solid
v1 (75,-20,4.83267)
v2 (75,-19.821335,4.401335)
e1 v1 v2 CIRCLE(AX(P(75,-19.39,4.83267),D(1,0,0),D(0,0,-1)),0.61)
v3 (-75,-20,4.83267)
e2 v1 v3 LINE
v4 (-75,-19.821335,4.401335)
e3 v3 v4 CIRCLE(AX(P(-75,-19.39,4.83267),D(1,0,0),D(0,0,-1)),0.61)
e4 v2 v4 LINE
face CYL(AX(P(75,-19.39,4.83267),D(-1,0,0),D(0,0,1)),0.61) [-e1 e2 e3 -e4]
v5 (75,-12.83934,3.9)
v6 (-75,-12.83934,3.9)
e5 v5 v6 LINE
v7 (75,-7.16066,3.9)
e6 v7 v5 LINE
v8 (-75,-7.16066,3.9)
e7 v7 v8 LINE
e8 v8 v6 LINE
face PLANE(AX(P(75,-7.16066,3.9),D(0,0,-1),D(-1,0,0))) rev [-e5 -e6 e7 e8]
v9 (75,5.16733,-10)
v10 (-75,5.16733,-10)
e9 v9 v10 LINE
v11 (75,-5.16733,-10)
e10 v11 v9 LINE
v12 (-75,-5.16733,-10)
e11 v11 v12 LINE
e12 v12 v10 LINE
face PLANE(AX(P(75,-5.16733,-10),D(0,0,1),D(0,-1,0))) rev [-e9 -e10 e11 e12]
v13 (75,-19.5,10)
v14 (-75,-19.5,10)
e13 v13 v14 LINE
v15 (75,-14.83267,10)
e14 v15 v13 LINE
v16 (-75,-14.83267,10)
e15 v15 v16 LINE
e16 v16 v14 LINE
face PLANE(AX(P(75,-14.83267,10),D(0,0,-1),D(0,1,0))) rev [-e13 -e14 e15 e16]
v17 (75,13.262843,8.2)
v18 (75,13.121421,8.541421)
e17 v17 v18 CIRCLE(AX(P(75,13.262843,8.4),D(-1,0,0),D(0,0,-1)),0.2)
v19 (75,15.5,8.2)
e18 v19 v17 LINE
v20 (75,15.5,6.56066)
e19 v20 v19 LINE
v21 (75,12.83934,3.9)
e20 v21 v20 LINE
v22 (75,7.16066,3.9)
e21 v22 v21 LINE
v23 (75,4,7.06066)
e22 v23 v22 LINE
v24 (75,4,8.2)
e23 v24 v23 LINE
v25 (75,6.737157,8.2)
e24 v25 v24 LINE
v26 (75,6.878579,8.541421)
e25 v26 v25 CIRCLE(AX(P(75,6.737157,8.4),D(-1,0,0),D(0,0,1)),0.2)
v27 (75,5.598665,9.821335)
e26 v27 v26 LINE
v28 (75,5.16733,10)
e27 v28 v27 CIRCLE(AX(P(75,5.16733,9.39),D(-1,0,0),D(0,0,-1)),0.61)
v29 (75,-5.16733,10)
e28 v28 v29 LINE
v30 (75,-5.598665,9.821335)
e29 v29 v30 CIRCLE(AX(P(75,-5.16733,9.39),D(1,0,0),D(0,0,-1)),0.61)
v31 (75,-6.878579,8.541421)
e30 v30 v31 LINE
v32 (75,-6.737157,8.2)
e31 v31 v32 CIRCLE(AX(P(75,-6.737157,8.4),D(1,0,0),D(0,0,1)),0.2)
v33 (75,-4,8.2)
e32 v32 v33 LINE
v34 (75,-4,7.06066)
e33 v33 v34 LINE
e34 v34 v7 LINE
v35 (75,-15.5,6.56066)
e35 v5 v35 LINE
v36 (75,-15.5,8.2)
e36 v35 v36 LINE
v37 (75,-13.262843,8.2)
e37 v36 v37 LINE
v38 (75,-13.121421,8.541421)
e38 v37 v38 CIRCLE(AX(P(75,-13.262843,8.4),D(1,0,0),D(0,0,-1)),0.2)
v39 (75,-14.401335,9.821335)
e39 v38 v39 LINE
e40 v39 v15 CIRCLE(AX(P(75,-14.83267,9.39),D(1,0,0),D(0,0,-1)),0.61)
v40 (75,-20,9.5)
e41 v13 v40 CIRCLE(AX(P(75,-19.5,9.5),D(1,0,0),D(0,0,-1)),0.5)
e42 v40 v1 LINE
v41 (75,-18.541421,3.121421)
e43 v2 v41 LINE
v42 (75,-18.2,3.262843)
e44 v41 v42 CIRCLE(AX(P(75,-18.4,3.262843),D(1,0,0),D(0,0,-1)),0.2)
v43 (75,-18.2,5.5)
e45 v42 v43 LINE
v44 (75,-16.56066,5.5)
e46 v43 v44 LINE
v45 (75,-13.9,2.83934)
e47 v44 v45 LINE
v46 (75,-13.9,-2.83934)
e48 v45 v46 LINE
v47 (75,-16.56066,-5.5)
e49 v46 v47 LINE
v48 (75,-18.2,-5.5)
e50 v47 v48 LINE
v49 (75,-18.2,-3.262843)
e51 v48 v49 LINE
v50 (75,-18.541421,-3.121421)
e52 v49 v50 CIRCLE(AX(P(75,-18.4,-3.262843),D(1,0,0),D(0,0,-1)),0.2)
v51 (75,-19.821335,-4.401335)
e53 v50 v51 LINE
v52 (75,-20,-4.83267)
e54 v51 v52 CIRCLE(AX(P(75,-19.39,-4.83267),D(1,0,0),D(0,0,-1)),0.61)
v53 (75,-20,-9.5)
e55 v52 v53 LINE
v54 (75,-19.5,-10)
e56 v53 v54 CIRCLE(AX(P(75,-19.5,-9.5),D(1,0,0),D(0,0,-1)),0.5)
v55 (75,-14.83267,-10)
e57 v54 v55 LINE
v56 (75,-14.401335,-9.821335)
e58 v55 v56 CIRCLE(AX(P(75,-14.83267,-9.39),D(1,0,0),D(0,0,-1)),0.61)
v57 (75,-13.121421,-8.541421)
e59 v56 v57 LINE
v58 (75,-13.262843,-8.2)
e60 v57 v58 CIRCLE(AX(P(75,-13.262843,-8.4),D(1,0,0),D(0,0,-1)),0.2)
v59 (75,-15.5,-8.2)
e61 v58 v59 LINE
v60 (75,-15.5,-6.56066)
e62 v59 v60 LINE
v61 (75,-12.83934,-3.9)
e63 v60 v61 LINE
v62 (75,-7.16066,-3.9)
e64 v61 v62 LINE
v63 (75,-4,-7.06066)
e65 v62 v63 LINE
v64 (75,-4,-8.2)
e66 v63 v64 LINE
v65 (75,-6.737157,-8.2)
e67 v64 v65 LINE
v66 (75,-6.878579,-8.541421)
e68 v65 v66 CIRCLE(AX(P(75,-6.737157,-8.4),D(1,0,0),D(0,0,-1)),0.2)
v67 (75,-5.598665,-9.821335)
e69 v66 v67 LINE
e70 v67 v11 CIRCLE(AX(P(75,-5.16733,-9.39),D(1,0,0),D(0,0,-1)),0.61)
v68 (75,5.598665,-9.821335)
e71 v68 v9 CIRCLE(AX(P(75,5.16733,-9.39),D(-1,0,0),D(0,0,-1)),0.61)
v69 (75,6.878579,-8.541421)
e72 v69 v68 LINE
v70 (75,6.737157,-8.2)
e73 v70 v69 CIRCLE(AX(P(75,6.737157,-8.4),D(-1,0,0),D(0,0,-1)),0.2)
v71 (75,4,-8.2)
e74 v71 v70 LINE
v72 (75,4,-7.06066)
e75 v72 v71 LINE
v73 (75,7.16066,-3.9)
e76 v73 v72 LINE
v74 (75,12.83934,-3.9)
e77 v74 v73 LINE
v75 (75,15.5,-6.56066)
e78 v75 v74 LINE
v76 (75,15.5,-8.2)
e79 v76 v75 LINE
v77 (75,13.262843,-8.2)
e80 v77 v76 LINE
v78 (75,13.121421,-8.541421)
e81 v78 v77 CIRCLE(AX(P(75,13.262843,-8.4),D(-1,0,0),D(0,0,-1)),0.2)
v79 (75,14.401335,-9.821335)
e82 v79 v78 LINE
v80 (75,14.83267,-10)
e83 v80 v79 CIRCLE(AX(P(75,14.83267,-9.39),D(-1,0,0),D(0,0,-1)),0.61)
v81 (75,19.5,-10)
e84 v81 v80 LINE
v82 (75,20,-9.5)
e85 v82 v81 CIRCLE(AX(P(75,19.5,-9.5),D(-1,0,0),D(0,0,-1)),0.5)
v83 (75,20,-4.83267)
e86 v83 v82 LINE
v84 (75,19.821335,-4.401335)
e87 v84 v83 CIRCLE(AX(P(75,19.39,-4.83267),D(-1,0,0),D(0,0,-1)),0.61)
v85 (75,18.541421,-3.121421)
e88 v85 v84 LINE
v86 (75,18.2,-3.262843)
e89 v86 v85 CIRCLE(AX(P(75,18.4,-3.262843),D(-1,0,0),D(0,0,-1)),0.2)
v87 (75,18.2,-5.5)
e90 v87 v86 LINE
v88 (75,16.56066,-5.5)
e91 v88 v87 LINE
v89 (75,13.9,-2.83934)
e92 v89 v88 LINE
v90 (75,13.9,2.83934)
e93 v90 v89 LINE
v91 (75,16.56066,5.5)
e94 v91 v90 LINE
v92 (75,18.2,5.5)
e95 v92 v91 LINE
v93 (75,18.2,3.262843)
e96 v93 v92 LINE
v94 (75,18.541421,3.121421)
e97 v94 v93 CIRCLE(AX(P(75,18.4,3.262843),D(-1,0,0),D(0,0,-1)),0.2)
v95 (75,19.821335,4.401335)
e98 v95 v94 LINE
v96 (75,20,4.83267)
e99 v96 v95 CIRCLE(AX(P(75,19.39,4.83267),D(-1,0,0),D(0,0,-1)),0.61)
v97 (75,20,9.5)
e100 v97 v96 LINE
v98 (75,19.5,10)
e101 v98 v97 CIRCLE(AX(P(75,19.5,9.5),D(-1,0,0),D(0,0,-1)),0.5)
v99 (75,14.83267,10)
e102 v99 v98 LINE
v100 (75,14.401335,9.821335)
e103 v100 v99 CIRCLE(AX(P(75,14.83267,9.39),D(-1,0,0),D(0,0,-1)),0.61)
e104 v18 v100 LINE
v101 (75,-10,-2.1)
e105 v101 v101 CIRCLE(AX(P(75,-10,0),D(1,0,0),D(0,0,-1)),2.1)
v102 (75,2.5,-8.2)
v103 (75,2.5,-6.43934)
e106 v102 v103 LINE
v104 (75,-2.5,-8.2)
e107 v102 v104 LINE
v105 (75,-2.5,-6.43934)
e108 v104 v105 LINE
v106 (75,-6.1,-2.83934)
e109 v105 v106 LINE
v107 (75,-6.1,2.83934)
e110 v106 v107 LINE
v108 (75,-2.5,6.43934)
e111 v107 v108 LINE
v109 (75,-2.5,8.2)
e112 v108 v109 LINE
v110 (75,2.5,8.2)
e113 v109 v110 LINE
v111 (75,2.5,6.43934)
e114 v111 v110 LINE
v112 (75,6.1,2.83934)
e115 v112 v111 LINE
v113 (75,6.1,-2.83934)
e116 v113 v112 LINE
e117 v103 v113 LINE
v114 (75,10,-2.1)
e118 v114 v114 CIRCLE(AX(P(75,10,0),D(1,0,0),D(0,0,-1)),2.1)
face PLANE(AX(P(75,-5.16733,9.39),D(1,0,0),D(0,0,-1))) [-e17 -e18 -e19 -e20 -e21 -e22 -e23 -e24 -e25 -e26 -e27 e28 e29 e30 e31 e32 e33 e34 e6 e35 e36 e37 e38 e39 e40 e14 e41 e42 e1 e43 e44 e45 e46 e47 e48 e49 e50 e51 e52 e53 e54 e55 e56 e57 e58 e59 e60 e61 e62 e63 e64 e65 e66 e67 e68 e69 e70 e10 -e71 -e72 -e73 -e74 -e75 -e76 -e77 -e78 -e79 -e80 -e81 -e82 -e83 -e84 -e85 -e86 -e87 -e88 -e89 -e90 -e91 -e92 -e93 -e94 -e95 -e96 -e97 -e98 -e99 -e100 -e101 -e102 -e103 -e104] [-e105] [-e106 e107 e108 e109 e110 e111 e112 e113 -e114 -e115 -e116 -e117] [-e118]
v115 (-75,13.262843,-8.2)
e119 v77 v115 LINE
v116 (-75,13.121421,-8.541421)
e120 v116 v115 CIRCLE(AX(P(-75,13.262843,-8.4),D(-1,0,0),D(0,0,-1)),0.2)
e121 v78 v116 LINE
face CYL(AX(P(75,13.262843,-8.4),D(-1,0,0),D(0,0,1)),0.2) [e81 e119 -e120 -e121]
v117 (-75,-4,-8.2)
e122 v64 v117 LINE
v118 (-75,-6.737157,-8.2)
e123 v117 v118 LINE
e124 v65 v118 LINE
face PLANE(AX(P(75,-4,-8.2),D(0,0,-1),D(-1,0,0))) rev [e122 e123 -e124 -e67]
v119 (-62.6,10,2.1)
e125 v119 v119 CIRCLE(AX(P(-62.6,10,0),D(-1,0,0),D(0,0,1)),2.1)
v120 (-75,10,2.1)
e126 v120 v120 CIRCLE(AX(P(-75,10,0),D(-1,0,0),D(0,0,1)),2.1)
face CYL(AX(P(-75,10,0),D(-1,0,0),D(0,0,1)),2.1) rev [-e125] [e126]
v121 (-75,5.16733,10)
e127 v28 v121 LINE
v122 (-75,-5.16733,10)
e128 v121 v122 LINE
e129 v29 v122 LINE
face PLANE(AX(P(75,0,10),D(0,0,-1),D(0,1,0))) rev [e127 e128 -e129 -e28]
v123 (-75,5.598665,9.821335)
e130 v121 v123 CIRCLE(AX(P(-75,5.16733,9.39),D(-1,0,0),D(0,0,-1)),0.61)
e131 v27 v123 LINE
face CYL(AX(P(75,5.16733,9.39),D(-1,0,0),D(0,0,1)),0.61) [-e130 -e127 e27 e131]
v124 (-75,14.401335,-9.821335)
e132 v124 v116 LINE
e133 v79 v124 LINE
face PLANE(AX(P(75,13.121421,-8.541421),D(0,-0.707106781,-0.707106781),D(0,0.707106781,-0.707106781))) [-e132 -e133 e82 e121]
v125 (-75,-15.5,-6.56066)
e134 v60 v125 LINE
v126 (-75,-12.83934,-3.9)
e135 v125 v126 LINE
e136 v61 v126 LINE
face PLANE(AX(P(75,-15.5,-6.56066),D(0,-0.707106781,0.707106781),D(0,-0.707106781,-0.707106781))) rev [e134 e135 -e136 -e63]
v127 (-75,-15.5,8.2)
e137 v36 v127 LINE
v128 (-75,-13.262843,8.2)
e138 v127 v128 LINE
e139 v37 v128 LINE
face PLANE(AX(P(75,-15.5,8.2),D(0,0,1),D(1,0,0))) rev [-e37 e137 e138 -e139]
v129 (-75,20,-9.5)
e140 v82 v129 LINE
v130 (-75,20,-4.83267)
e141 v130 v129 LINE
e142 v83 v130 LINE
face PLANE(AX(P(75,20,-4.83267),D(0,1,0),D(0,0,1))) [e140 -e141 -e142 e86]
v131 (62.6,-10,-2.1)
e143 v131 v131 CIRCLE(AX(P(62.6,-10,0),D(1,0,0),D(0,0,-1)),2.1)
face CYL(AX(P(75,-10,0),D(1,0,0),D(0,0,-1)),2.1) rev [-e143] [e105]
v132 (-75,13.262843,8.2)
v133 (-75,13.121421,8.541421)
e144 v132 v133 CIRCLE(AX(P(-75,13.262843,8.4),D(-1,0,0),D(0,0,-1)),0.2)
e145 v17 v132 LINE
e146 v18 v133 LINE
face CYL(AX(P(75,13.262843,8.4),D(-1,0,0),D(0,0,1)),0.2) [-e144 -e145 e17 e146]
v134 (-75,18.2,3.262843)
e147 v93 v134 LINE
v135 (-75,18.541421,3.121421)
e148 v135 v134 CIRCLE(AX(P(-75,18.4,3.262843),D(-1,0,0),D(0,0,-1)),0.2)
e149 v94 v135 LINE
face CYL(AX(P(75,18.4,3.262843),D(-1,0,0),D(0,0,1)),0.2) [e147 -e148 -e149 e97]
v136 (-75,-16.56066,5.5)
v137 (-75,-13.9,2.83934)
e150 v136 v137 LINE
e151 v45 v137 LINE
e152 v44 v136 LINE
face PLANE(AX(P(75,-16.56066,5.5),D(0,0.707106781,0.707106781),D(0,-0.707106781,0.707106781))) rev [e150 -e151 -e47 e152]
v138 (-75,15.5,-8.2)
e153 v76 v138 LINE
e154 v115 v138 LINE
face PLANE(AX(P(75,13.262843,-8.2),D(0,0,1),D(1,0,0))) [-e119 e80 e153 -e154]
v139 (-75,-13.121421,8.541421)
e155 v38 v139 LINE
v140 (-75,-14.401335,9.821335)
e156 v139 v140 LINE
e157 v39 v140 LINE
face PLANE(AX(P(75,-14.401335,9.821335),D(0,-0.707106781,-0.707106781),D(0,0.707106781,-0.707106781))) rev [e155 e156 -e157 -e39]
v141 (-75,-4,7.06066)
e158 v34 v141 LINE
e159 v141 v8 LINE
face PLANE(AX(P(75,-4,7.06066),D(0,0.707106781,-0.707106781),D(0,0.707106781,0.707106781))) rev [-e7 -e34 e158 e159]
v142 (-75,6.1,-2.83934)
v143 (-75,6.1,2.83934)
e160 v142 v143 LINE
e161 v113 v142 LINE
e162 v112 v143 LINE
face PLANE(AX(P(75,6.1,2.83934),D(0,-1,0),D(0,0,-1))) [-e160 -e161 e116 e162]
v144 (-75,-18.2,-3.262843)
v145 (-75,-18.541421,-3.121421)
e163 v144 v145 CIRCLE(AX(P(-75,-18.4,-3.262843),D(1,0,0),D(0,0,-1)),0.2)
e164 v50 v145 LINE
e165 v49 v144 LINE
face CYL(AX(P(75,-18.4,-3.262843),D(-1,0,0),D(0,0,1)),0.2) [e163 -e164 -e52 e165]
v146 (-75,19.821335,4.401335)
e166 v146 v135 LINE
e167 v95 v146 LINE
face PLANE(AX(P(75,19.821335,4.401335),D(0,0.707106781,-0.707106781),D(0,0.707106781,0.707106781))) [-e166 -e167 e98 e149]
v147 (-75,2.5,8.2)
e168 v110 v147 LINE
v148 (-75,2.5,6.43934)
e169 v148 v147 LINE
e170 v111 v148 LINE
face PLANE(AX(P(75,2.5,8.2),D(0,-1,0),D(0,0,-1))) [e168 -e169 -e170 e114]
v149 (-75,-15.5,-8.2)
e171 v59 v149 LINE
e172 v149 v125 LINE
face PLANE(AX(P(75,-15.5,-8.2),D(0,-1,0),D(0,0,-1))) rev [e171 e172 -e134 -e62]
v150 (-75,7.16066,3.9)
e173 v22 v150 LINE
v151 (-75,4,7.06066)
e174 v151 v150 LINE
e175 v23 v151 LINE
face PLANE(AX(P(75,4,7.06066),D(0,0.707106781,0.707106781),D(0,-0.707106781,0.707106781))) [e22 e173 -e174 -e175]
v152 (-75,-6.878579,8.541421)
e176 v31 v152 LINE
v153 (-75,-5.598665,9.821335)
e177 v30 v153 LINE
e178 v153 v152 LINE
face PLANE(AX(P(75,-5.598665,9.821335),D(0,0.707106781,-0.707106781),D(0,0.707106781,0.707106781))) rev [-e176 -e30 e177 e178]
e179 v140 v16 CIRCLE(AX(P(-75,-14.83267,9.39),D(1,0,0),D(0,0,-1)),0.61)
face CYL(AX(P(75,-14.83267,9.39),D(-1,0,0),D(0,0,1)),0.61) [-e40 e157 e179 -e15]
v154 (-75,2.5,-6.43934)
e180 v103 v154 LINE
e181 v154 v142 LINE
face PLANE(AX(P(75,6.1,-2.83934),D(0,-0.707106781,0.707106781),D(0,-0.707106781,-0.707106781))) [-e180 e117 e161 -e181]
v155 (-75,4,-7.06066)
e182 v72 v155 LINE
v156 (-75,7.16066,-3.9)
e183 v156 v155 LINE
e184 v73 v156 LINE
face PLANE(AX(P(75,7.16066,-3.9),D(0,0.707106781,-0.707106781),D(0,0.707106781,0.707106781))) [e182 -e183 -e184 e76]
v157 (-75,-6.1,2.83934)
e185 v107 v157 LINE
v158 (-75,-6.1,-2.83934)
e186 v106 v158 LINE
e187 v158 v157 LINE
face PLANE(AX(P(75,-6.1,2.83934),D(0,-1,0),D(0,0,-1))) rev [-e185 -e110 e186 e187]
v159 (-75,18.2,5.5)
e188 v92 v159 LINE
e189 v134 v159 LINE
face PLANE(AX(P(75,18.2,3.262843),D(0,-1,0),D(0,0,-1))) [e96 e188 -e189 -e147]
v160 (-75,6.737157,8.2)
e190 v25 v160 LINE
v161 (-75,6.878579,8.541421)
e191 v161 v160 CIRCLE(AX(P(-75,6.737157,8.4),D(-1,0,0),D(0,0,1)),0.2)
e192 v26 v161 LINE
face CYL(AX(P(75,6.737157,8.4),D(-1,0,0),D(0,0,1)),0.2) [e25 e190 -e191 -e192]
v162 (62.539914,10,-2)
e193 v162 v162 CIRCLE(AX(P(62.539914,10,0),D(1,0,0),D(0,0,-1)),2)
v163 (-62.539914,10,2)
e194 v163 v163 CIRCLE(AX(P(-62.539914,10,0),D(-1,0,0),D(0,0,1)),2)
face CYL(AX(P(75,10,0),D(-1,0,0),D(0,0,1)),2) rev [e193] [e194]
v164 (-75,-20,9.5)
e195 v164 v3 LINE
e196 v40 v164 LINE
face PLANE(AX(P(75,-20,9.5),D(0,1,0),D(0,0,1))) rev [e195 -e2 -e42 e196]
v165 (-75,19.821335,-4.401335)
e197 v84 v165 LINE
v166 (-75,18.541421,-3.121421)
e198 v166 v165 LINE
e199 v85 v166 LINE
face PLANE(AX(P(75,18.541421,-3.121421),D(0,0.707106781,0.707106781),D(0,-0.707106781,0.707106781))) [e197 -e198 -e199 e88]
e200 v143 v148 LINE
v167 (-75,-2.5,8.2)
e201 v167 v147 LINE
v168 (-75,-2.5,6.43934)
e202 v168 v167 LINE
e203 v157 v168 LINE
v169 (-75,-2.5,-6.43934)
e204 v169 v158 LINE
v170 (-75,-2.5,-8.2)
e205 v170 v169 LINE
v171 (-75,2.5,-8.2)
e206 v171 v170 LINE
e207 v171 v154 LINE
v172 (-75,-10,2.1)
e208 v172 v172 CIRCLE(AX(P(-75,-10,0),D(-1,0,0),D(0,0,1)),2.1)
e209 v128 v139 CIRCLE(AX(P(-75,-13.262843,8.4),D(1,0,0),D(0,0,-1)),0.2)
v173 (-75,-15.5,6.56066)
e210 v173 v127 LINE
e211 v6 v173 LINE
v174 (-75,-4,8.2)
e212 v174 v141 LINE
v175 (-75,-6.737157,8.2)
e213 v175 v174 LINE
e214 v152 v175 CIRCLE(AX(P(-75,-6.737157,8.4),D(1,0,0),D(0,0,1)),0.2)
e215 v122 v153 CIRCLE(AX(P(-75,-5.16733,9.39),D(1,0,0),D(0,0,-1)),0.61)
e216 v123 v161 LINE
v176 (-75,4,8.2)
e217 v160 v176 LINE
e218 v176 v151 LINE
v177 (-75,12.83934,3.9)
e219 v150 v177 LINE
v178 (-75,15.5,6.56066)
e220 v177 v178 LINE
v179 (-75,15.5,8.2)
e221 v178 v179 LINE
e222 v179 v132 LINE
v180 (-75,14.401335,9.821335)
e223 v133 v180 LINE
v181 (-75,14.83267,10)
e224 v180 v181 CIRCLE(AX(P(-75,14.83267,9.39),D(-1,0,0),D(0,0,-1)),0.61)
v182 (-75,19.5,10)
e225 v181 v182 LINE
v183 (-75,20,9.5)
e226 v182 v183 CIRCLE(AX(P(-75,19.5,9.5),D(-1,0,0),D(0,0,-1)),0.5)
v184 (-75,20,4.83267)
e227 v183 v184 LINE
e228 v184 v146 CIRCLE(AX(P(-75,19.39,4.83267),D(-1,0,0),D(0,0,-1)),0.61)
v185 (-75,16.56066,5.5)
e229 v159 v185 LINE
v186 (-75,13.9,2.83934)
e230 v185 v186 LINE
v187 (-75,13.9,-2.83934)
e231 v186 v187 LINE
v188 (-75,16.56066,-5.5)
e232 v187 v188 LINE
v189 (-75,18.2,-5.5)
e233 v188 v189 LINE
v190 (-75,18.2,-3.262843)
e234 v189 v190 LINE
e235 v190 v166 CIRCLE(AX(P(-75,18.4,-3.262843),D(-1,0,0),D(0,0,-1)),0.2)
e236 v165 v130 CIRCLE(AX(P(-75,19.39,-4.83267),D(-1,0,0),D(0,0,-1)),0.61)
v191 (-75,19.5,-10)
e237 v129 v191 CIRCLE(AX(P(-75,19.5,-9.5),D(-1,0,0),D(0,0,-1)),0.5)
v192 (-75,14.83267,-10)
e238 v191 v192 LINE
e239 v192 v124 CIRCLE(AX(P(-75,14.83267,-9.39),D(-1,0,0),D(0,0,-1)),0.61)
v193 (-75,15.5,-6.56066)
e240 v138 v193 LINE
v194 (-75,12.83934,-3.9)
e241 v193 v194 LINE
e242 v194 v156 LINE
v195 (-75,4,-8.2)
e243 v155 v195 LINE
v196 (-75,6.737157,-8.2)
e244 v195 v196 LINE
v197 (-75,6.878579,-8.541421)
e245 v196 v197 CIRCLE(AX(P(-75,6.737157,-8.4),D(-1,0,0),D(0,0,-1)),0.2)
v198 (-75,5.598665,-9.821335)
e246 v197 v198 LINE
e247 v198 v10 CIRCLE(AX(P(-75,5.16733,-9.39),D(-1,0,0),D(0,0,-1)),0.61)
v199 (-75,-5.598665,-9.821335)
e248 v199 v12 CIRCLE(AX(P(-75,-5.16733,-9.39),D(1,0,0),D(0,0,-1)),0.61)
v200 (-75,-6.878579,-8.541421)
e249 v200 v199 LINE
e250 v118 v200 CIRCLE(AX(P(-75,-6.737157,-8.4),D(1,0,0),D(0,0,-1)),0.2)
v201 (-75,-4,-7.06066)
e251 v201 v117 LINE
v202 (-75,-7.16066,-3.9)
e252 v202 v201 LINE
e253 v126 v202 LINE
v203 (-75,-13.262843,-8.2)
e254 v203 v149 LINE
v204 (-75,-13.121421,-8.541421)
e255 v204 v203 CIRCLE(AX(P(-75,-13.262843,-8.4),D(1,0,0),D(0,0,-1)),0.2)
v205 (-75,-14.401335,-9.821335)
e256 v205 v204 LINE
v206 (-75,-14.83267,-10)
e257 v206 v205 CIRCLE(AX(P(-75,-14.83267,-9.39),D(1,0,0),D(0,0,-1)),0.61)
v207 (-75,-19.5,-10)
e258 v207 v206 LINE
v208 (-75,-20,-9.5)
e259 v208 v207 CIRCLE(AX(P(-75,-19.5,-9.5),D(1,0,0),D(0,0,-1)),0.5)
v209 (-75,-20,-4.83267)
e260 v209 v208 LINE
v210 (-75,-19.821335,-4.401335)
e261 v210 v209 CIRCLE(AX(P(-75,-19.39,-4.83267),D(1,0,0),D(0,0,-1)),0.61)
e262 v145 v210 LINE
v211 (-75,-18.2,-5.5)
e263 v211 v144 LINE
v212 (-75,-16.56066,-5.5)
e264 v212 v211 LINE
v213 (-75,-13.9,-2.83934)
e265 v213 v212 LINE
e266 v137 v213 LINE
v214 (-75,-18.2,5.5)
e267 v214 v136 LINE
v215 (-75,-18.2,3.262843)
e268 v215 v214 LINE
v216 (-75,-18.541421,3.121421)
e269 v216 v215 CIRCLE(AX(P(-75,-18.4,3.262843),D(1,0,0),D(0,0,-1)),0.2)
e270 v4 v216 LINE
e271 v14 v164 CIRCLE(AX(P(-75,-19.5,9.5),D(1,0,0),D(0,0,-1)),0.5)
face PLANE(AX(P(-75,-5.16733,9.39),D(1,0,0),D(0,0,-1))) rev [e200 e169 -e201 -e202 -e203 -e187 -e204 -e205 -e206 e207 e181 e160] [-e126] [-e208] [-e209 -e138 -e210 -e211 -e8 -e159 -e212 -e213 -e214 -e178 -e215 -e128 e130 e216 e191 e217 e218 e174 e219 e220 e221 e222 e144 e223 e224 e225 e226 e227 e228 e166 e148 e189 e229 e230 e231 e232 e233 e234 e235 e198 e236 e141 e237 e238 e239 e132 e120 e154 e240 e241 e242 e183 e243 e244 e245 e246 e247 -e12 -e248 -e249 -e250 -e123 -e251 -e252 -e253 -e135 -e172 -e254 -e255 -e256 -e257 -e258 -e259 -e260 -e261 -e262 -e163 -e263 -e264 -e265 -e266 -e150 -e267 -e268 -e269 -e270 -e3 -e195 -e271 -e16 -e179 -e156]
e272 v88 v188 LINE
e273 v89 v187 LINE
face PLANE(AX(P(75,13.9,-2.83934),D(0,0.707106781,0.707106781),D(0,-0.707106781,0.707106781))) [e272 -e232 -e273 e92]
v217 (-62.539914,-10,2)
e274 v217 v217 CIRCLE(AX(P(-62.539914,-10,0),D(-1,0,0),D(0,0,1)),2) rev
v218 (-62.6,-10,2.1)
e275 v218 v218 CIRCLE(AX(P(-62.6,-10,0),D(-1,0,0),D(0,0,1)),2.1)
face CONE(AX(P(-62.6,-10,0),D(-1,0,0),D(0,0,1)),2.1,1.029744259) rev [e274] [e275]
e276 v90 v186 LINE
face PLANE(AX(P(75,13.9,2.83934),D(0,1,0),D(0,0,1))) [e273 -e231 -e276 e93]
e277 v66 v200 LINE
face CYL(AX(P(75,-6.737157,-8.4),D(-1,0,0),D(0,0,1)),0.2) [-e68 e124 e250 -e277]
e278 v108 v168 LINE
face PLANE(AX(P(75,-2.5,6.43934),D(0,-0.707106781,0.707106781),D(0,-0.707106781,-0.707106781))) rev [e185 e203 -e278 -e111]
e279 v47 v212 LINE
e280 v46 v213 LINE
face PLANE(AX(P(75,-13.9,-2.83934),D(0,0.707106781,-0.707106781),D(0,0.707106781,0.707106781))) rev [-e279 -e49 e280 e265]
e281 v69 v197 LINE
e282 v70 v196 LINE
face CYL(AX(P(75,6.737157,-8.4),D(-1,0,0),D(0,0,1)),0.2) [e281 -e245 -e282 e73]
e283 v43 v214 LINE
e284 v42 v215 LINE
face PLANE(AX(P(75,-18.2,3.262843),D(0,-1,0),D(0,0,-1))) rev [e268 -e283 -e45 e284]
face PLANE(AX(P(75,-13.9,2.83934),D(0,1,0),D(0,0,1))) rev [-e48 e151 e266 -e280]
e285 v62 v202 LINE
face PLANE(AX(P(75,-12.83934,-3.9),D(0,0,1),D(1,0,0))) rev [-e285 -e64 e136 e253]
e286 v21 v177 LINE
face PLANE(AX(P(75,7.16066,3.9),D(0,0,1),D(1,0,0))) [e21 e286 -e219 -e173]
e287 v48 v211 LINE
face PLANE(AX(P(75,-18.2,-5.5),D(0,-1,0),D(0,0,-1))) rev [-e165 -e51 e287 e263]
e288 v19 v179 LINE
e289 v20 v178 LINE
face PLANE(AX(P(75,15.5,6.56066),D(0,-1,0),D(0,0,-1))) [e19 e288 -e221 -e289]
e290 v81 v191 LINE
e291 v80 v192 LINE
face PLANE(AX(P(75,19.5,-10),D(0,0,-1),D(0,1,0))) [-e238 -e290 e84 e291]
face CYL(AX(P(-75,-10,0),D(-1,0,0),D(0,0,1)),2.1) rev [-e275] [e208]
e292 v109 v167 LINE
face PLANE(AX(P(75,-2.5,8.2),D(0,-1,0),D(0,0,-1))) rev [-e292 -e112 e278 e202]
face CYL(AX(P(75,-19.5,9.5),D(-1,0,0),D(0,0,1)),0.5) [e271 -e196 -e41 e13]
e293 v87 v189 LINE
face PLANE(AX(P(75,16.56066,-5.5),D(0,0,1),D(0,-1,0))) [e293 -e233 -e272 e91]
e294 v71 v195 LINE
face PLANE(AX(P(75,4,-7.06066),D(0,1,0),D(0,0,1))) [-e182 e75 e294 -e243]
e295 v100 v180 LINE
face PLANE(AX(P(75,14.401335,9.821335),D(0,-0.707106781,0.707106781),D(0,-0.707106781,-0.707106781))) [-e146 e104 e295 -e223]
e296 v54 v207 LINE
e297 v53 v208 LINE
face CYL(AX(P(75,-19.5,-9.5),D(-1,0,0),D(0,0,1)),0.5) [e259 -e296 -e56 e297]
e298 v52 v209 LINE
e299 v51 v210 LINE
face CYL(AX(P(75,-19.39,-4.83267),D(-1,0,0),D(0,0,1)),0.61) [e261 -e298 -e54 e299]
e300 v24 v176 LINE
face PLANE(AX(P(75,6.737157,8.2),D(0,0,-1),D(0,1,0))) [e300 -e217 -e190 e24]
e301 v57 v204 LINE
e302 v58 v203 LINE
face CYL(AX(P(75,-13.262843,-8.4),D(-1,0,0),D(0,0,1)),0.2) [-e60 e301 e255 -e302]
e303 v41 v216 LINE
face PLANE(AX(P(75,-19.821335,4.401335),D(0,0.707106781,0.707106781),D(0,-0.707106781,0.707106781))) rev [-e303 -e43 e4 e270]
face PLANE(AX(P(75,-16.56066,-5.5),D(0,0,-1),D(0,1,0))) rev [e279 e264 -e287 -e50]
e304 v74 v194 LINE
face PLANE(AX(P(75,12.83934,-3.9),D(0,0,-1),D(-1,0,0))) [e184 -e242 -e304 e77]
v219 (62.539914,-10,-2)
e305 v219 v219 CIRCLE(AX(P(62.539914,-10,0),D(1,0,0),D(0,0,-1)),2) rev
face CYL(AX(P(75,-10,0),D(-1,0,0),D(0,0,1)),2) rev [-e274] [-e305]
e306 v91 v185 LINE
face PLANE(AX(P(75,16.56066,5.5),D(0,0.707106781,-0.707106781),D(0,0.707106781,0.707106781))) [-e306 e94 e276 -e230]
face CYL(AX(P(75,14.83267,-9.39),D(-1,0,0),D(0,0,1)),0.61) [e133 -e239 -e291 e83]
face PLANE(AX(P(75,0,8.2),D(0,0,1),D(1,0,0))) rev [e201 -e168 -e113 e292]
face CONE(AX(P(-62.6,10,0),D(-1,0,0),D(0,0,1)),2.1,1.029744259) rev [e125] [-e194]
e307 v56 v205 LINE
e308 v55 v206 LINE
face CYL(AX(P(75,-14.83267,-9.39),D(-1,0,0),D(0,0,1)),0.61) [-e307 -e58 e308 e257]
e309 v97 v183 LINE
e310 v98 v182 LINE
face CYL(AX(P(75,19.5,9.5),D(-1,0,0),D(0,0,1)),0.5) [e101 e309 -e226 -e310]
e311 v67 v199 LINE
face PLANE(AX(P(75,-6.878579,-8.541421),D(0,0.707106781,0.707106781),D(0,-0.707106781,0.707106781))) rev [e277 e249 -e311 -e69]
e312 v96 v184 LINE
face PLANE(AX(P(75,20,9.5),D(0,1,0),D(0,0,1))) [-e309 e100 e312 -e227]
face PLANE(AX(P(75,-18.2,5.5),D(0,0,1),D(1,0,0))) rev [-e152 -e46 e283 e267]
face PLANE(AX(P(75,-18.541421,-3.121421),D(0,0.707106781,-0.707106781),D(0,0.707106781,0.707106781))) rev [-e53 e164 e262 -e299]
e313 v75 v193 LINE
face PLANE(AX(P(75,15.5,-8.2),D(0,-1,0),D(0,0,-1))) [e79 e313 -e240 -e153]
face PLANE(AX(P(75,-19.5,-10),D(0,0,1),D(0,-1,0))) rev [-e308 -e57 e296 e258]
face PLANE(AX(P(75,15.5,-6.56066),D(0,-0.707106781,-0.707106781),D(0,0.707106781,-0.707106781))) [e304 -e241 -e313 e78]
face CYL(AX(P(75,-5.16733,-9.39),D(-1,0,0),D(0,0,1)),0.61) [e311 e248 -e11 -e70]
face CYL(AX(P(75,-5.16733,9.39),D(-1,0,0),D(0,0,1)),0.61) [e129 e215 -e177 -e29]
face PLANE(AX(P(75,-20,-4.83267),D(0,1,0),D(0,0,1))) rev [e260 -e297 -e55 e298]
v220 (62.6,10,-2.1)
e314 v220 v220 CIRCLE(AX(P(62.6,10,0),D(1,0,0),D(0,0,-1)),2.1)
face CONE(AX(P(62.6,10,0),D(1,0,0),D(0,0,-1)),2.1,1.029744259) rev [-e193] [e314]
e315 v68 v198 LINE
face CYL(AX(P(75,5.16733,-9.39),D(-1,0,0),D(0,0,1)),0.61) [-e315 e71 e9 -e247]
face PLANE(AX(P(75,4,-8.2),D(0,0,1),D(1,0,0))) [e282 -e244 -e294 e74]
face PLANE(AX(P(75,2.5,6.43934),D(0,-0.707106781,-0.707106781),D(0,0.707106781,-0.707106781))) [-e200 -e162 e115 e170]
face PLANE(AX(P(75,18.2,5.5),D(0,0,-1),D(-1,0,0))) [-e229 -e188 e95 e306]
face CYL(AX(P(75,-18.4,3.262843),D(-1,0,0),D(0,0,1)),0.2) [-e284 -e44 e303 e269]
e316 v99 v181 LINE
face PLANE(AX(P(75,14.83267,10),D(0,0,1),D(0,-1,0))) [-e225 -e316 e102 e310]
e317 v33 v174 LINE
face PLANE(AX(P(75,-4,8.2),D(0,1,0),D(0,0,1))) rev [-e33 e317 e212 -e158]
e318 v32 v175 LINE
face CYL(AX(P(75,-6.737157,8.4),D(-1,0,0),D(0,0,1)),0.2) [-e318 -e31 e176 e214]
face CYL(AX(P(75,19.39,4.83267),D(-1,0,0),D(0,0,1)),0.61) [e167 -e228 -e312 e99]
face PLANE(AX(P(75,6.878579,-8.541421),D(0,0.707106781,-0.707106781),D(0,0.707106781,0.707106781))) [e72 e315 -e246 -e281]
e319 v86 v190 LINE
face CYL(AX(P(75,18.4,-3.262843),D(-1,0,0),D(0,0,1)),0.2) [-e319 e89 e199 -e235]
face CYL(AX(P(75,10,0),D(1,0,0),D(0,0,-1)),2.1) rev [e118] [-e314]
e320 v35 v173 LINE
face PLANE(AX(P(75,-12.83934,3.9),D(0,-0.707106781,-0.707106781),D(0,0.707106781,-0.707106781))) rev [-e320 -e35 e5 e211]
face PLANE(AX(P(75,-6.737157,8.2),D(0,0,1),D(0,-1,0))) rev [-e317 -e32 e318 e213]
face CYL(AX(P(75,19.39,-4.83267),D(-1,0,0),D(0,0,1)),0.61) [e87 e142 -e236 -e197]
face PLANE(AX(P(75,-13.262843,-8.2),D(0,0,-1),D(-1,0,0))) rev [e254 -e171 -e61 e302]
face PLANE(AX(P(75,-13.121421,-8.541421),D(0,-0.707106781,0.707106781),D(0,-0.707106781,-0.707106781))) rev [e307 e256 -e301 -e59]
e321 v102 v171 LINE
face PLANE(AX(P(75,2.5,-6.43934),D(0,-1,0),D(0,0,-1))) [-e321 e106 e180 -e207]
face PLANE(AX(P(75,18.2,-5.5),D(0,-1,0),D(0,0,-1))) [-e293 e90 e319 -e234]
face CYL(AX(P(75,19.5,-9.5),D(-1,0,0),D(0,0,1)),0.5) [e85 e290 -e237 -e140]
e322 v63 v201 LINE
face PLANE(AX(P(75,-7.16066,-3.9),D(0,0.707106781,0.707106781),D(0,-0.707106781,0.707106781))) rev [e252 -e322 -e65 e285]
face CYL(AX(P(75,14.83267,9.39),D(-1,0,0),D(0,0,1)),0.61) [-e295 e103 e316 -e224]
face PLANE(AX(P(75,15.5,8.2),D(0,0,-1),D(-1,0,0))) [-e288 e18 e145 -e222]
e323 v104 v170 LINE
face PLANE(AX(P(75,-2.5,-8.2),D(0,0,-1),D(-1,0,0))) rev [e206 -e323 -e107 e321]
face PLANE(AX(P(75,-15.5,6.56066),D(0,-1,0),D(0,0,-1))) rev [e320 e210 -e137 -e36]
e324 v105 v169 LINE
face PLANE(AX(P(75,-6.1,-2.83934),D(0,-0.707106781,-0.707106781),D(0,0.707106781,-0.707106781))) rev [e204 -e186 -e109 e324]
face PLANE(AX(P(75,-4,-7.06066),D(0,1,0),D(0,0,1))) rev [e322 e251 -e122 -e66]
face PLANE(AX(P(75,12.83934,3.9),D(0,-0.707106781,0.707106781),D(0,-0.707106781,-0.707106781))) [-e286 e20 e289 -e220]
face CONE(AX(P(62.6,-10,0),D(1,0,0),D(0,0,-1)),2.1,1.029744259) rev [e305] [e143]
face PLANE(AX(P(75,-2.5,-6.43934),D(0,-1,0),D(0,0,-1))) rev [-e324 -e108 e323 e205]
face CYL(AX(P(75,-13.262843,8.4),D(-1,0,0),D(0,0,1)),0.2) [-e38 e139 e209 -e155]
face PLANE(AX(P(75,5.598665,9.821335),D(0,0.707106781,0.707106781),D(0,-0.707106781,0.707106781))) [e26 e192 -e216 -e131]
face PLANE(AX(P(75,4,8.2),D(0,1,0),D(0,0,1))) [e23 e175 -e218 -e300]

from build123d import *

# Parameters (mm, degrees)
SKETCH1_R           = 2
BOSS_EXTRUDE1_DEPTH = 75


# Read off the part's stored shape, not the designer's step: M5 Tapped Hole1
with BuildPart() as part:
    # Sketch1 → Boss-Extrude1 (new, symmetric)
    with BuildSketch(Plane(origin=(0, 0, 0), x_dir=(0, 0, -1), z_dir=(1, 0, 0))):
        with BuildLine():
            Line((-10, 0), (-8.2, 0))
            Line((-8.2, 0), (-8.2, -2.5))
            Line((-8.2, -2.5), (-6.43933983, -2.5))
            Line((-6.43933983, -2.5), (-2.839339831, -6.099999999))
            Line((-2.839339831, -6.099999999), (2.839339828, -6.099999999))
            Line((2.839339828, -6.099999999), (6.439339829, -2.499999999))
            Line((6.439339829, -2.499999999), (8.2, -2.499999999))
            Line((8.2, -2.499999999), (8.2, 0))
            Line((8.2, 0), (10, 0))
            Line((10, 0), (10, -5.167329724))
            ThreePointArc((10, -5.167329724), (9.953566515, -5.400766617), (9.821335137, -5.59866486))
            Line((9.821335137, -5.59866486), (8.541421356, -6.87857864))
            ThreePointArc((8.541421356, -6.87857864), (8.323463314, -6.921933191), (8.2, -6.737157284))
            Line((8.2, -6.737157284), (8.2, -3.999999998))
            Line((8.2, -3.999999998), (7.06066017, -3.999999998))
            Line((7.06066017, -3.999999998), (3.9, -7.160660168))
            Line((3.9, -7.160660168), (3.9, -12.83933983))
            Line((3.9, -12.83933983), (6.560660169, -15.499999999))
            Line((6.560660169, -15.499999999), (8.2, -15.499999999))
            Line((8.2, -15.499999999), (8.2, -13.262842712))
            ThreePointArc((8.2, -13.262842712), (8.323463314, -13.078066805), (8.541421356, -13.121421355))
            Line((8.541421356, -13.121421355), (9.821335137, -14.401335136))
            ThreePointArc((9.821335137, -14.401335136), (9.953566515, -14.599233379), (10, -14.832670272))
            Line((10, -14.832670272), (10, -19.499999999))
            ThreePointArc((10, -19.499999999), (9.853553391, -19.85355339), (9.5, -19.999999999))
            Line((9.5, -19.999999999), (4.832670273, -19.999999999))
            ThreePointArc((4.832670273, -19.999999999), (4.599233379, -19.953566514), (4.401335137, -19.821335136))
            Line((4.401335137, -19.821335136), (3.121421356, -18.541421355))
            ThreePointArc((3.121421356, -18.541421355), (3.078066806, -18.323463313), (3.262842712, -18.199999999))
            Line((3.262842712, -18.199999999), (5.5, -18.199999999))
            Line((5.5, -18.199999999), (5.5, -16.560660171))
            Line((5.5, -16.560660171), (2.839339828, -13.899999999))
            Line((2.839339828, -13.899999999), (-2.839339828, -13.899999999))
            Line((-2.839339828, -13.899999999), (-5.5, -16.560660171))
            Line((-5.5, -16.560660171), (-5.5, -18.199999999))
            Line((-5.5, -18.199999999), (-3.262842712, -18.199999999))
            ThreePointArc((-3.262842712, -18.199999999), (-3.078066806, -18.323463313), (-3.121421356, -18.541421355))
            Line((-3.121421356, -18.541421355), (-4.401335137, -19.821335136))
            ThreePointArc((-4.401335137, -19.821335136), (-4.599233379, -19.953566514), (-4.832670273, -19.999999999))
            Line((-4.832670273, -19.999999999), (-9.5, -19.999999999))
            ThreePointArc((-9.5, -19.999999999), (-9.853553391, -19.85355339), (-10, -19.499999999))
            Line((-10, -19.499999999), (-10, -14.832670272))
            ThreePointArc((-10, -14.832670272), (-9.953566515, -14.599233379), (-9.821335137, -14.401335136))
            Line((-9.821335137, -14.401335136), (-8.541421356, -13.121421355))
            ThreePointArc((-8.541421356, -13.121421355), (-8.323463314, -13.078066805), (-8.2, -13.262842712))
            Line((-8.2, -13.262842712), (-8.2, -15.499999999))
            Line((-8.2, -15.499999999), (-6.560660172, -15.499999999))
            Line((-6.560660172, -15.499999999), (-3.9, -12.839339827))
            Line((-3.9, -12.839339827), (-3.9, -7.160660171))
            Line((-3.9, -7.160660171), (-7.06066017, -4.000000001))
            Line((-7.06066017, -4.000000001), (-8.2, -4.000000001))
            Line((-8.2, -4.000000001), (-8.2, -6.737157287))
            ThreePointArc((-8.2, -6.737157287), (-8.323463314, -6.921933193), (-8.541421356, -6.878578643))
            Line((-8.541421356, -6.878578643), (-9.821335137, -5.598664863))
            ThreePointArc((-9.821335137, -5.598664863), (-9.953566515, -5.40076662), (-10, -5.167329726))
            Line((-10, -5.167329726), (-10, 0))
        make_face()
        with Locations((0, -9.999999999)):
            Circle(SKETCH1_R, mode=Mode.SUBTRACT)
    boss_extrude1 = extrude(amount=BOSS_EXTRUDE1_DEPTH, both=True)


with BuildPart() as mirror1_1:
    # Mirror1: Boss-Extrude1 across Top Plane
    add(boss_extrude1.mirror(Plane(origin=(0, 0, 0), x_dir=(1, 0, 0), z_dir=(0, 1, 0))))


with BuildPart() as part_1:
    add(part.part)

    # Mirror1 united with what the copies touc: union Mirror1_1
    add(mirror1_1.part)

    # M5 Tapped Hole1 outline → M5 Tapped Hole1 (revolve, cut)
    with BuildSketch(Plane(origin=(0, 9.999999999, 0), x_dir=(0, 1, 0), z_dir=(0, 0, -1))):
        Polygon((2.1, -62.6), (2, -62.539913938), (2, -75), (2.1, -75), align=None)
        Polygon((2, 75), (2, 62.539913938), (2.1, 62.6), (2.1, 75), align=None)
    revolve(axis=Axis((0, 9.999999999, 0), (1, 0, 0)), mode=Mode.SUBTRACT)

    # M5 Tapped Hole1 2 outline → M5 Tapped Hole1 2 (revolve, cut)
    with BuildSketch(Plane(origin=(0, -9.999999999, 0), x_dir=(0, 1, 0), z_dir=(0, 0, -1))):
        Polygon((2.1, -62.6), (2, -62.539913938), (2, -75), (2.1, -75), align=None)
        Polygon((2, 75), (2, 62.539913938), (2.1, 62.6), (2.1, 75), align=None)
    revolve(axis=Axis((0, -9.999999999, 0), (1, 0, 0)), mode=Mode.SUBTRACT)


solid = part_1.part
